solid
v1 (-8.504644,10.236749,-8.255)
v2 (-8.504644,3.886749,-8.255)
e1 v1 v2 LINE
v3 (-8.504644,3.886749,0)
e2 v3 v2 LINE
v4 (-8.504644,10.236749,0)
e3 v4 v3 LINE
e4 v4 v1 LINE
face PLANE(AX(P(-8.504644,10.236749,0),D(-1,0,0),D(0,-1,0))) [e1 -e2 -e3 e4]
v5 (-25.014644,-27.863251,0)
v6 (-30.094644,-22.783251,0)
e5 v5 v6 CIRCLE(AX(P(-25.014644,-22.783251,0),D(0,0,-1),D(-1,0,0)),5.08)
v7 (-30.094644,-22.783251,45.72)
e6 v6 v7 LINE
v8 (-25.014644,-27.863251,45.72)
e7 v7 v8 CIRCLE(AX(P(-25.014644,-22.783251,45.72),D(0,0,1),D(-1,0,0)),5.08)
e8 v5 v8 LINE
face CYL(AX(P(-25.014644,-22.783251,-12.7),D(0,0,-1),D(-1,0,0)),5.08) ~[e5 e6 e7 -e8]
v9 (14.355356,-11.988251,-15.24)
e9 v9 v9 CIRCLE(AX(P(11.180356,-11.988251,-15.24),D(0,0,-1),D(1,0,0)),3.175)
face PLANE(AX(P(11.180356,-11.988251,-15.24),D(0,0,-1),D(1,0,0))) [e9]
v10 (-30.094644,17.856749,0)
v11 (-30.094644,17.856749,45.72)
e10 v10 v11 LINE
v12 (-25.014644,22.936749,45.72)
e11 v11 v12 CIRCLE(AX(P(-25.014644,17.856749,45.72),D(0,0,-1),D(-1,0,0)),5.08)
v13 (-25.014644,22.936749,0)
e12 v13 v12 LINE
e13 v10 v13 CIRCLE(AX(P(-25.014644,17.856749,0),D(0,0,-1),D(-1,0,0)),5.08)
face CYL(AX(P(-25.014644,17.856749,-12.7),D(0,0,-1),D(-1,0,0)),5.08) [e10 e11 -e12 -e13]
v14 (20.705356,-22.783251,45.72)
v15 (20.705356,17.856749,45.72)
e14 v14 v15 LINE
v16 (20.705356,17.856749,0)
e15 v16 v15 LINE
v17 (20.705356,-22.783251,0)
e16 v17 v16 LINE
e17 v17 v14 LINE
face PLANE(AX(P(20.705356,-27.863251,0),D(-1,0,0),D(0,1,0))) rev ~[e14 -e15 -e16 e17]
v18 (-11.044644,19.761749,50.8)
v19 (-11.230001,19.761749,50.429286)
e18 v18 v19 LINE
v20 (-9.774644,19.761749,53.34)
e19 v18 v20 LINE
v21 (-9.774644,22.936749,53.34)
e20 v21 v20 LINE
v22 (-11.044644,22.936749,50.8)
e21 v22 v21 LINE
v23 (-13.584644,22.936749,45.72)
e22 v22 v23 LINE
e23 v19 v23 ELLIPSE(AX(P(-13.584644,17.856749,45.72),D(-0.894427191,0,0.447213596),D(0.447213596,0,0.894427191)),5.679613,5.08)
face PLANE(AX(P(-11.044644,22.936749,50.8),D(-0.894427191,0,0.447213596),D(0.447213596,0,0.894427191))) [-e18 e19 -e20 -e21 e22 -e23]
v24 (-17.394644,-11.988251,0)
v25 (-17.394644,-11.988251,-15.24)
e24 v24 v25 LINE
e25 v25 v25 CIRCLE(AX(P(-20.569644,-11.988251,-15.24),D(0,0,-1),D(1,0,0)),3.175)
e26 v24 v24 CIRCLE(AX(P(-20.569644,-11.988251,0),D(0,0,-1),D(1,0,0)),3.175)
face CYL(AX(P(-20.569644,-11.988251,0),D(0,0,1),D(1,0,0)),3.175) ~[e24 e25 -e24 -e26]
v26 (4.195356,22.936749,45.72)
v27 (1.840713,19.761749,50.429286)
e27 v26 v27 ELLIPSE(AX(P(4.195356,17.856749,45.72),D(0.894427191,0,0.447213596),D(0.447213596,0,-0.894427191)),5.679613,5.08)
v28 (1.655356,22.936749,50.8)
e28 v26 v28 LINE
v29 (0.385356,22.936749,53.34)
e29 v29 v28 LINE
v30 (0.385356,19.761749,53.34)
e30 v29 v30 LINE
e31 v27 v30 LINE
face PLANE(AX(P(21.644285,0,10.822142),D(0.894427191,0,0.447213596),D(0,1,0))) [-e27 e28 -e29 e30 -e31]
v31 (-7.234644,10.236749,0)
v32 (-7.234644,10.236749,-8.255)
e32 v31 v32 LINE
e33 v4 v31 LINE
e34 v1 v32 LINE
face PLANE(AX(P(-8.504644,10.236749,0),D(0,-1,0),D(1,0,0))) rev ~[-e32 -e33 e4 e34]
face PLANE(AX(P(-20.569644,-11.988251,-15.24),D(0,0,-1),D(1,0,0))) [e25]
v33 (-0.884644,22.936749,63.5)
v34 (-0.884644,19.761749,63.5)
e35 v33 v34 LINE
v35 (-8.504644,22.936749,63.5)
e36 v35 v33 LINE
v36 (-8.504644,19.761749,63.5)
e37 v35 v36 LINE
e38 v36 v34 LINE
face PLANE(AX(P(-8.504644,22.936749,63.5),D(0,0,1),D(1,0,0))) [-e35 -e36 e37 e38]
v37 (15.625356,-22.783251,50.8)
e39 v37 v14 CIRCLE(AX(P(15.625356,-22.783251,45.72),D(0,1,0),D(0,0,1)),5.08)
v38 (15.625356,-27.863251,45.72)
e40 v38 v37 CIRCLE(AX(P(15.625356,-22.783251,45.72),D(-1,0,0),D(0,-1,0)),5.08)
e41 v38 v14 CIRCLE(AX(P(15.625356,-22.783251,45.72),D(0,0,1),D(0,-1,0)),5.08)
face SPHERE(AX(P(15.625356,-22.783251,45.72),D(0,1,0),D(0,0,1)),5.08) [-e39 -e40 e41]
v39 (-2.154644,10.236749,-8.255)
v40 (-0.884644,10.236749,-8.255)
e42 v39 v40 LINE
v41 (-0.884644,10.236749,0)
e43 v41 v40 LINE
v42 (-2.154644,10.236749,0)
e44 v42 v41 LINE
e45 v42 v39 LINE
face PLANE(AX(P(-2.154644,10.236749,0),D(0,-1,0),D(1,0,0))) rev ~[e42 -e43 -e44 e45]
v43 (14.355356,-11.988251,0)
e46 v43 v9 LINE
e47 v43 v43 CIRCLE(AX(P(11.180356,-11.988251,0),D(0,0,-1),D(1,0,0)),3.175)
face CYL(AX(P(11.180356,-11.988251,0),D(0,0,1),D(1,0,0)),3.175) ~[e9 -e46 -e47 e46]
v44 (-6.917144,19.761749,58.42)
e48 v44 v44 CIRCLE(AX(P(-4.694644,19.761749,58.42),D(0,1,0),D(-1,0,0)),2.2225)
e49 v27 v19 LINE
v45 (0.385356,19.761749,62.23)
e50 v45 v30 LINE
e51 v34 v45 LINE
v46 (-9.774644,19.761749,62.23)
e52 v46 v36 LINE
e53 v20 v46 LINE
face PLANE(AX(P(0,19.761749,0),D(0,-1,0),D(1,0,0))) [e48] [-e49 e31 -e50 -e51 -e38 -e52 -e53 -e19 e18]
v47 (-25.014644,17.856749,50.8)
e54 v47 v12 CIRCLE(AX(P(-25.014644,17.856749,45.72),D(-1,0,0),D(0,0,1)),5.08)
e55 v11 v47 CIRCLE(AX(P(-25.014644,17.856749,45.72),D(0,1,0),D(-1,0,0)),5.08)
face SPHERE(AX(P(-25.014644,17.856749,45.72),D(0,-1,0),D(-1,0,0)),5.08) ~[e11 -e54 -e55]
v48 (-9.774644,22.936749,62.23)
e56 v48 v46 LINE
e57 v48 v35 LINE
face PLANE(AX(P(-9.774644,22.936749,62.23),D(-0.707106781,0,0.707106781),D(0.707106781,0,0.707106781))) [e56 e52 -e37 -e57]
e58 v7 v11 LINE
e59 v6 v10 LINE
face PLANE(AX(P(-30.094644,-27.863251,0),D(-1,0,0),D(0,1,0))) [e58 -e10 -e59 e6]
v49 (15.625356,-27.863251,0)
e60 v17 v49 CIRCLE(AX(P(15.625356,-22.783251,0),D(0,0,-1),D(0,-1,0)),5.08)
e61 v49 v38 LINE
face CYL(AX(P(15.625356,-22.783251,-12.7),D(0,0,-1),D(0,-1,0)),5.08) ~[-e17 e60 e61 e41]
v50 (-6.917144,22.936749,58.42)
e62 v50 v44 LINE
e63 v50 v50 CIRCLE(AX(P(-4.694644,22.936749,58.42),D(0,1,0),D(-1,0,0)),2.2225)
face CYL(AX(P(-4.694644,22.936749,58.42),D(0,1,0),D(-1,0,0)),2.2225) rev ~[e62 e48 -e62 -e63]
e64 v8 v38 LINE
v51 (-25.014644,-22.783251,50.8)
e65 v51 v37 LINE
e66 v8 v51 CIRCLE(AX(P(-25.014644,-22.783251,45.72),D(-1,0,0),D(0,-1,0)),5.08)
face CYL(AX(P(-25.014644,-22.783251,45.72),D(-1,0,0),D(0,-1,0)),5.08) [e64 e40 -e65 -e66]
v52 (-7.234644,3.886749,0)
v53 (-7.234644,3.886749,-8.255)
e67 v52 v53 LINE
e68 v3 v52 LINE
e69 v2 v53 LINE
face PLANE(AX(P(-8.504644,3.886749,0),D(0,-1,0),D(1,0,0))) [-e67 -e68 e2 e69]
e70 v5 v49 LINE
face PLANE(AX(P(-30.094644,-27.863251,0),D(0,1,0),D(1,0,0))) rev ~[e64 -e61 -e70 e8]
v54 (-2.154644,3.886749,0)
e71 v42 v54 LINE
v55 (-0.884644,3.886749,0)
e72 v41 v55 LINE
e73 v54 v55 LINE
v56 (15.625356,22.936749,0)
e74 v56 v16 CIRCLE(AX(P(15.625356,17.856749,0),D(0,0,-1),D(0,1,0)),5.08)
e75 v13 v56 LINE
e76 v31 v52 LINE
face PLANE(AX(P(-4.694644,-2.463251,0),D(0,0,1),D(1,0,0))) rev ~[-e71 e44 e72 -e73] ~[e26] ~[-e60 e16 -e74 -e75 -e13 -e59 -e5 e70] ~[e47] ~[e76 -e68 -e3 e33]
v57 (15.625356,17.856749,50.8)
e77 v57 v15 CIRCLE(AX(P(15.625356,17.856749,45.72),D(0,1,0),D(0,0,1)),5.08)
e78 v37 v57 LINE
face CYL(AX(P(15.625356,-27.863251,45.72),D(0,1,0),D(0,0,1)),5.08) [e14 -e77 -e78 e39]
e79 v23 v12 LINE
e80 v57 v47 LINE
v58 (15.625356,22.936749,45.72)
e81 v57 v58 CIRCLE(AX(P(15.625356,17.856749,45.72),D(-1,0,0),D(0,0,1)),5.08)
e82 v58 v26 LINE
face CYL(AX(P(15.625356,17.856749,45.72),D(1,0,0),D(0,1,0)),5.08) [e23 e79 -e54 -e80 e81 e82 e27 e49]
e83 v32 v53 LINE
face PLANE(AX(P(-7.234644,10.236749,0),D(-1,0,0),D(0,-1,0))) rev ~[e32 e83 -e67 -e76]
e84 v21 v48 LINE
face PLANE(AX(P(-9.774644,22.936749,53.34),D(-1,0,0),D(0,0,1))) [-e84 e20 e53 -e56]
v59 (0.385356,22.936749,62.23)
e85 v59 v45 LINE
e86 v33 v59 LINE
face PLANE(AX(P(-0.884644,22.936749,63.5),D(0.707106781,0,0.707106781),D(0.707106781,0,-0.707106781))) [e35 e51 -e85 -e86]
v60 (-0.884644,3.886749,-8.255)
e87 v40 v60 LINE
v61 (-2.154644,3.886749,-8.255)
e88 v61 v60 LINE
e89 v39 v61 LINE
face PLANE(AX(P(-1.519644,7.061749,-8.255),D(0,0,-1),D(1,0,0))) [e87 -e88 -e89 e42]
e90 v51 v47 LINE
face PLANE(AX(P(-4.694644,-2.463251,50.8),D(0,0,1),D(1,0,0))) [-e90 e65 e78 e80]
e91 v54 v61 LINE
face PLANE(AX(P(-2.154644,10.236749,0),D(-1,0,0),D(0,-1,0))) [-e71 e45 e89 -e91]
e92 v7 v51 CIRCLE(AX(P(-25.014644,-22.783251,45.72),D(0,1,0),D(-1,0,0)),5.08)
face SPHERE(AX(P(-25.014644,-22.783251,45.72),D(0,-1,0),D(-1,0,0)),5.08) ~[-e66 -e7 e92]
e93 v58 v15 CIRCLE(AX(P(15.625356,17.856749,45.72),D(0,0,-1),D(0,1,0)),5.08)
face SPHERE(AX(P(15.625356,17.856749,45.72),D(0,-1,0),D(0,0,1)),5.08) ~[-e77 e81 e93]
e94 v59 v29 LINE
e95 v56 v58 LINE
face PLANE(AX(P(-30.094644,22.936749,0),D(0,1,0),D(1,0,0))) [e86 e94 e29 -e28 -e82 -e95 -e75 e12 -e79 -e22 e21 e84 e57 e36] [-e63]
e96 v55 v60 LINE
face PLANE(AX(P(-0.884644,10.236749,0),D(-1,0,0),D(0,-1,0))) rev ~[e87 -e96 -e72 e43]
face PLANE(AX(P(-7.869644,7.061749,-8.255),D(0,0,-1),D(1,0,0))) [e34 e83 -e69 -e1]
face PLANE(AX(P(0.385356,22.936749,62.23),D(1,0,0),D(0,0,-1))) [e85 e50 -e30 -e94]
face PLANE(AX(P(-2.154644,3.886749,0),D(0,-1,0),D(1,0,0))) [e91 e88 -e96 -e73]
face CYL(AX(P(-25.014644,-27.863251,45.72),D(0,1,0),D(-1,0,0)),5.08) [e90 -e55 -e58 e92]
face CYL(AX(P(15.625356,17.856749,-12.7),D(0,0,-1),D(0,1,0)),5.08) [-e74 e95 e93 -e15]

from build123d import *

# Parameters (mm, degrees)
F0_W         = 50.8
F0_H         = 50.8
F1_DEPTH     = 50.8
F2_R         = 2.2225
F3_DEPTH     = 3.175
F5_R         = 5.08
F6_T1_DEPTH  = 40.64
F6_T3_DEPTH  = 58.42
F6_T6_ANGLE  = 90
F6_T10_DEPTH = 26.67
F6_T16_DEPTH = 26.67
F6_T22_DEPTH = 26.67
F6_T27_ANGLE = 90
F6_T31_DEPTH = 26.67
F6_T38_DEPTH = 26.67
F6_T44_DEPTH = 26.67
F6_T48_ANGLE = 90
F6_T50_ANGLE = 90
F7_R         = 3.175
F8_DEPTH     = 15.24
F7_W         = 1.27
F7_H         = 6.35
F9_DEPTH     = 8.255


# Not quite as in the source:
# - a fillet or chamfer that OpenCascade refuses, or shapes differently, is made with other operations: its cross-section is extruded or revolved along the edge and cut away or added
# - a feature of the source that left no trace in its solid (it failed there, or was rolled back) is left out


with BuildPart() as f1:
    # F0 (on Top) → F1 (new body)
    with BuildSketch(Plane.XY):
        with Locations((-4.6946440548, -2.4632510453)):
            Rectangle(F0_W, F0_H)
    extrude(amount=F1_DEPTH)

    # F2 (on face) → F3 (join)
    with BuildSketch(Plane(origin=(0, 22.9367489547, 0), x_dir=(-1, 0, 0), z_dir=(0, 1, 0))):
        Polygon((-0.3853559452, 62.23), (-0.3853559452, 53.34), (9.7746440548, 53.34), (9.7746440548, 62.23), (8.5046440548, 63.5), (0.8846440548, 63.5), align=None)
        with Locations((4.6946440548, 58.42)):
            Circle(F2_R, mode=Mode.SUBTRACT)
        Polygon((-0.3853559452, 53.34), (-1.6553559452, 50.8), (11.0446440548, 50.8), (9.7746440548, 53.34), align=None)
    extrude(amount=-F3_DEPTH)

    # F5
    f5_edges = [f1.edges().sort_by_distance(p)[0] for p in [
        (-30.094644, -2.463251, 50.8),
        (20.705356, -2.463251, 50.8),
    ]]
    fillet(f5_edges, radius=F5_R)

    # F6: fillet of radius 5.08 on 11 edges, made by hand

    # F6_s2 → F6_t1 (cut)
    with BuildSketch(Plane.YZ.offset(-25.0146440548)):
        with BuildLine():
            ThreePointArc((-27.8632510453, 45.72), (-26.3753534938, 49.3121024484), (-22.7832510453, 50.8))
            Line((-22.7832510453, 50.8), (-27.8632510453, 50.8))
            Line((-27.8632510453, 50.8), (-27.8632510453, 45.72))
        make_face()
    extrude(amount=F6_T1_DEPTH, mode=Mode.SUBTRACT)

    # F6_s4 → F6_t3 (cut)
    with BuildSketch(Plane.XY.offset(-12.7)):
        with BuildLine():
            ThreePointArc((-30.0946440548, 17.8567489547), (-28.6067465032, 21.4488514031), (-25.0146440548, 22.9367489547))
            Line((-25.0146440548, 22.9367489547), (-30.0946440548, 22.9367489547))
            Line((-30.0946440548, 22.9367489547), (-30.0946440548, 17.8567489547))
        make_face()
        with BuildLine():
            ThreePointArc((-30.0946440548, -22.7832510453), (-28.6067465032, -26.3753534938), (-25.0146440548, -27.8632510453))
            Line((-25.0146440548, -27.8632510453), (-30.0946440548, -27.8632510453))
            Line((-30.0946440548, -27.8632510453), (-30.0946440548, -22.7832510453))
        make_face()
        with BuildLine():
            ThreePointArc((15.6253559452, 22.9367489547), (19.2174583937, 21.4488514031), (20.7053559452, 17.8567489547))
            Line((20.7053559452, 17.8567489547), (20.7053559452, 22.9367489547))
            Line((20.7053559452, 22.9367489547), (15.6253559452, 22.9367489547))
        make_face()
        with BuildLine():
            ThreePointArc((15.6253559452, -27.8632510453), (19.2174583937, -26.3753534938), (20.7053559452, -22.7832510453))
            Line((20.7053559452, -22.7832510453), (20.7053559452, -27.8632510453))
            Line((20.7053559452, -27.8632510453), (15.6253559452, -27.8632510453))
        make_face()
    extrude(amount=F6_T3_DEPTH, mode=Mode.SUBTRACT)

    # F6_s5 → F6_t6 (revolve, cut)
    with BuildSketch(Plane.YZ.offset(15.6253559452)):
        with BuildLine():
            ThreePointArc((22.9367489547, 45.72), (21.4488514031, 49.3121024484), (17.8567489547, 50.8))
            Line((17.8567489547, 50.8), (22.9367489547, 50.8))
            Line((22.9367489547, 50.8), (22.9367489547, 45.72))
        make_face()
    revolve(axis=Axis((15.6253559452, 22.9367489547, 45.72), (0, 1, 0)), revolution_arc=F6_T6_ANGLE, mode=Mode.SUBTRACT)


with BuildPart() as f6_tool8:
    # F6_s9 → F6_t10 (new body)
    with BuildSketch(Plane.YZ.offset(15.6253559452)):
        with BuildLine():
            ThreePointArc((22.9367489547, 45.72), (21.4488514031, 49.3121024484), (17.8567489547, 50.8))
            Line((17.8567489547, 50.8), (22.9367489547, 50.8))
            Line((22.9367489547, 50.8), (22.9367489547, 45.72))
        make_face()
    extrude(amount=-F6_T10_DEPTH)

    split(bisect_by=Plane.XZ.offset(-19.7617489547), keep=Keep.BOTTOM)

    split(bisect_by=Plane(origin=(21.6442847562, 0, 10.8221423781), x_dir=(0, 1, 0), z_dir=(0.894427191, 0, 0.4472135955)), keep=Keep.TOP)


with BuildPart() as f1_1:
    add(f1.part)

    # F6_t7: cut F6_tool8
    add(f6_tool8.part, mode=Mode.SUBTRACT)


with BuildPart() as f6_tool14:
    # F6_s15 → F6_t16 (new body)
    with BuildSketch(Plane.YZ.offset(15.6253559452)):
        with BuildLine():
            ThreePointArc((22.9367489547, 45.72), (21.4488514031, 49.3121024484), (17.8567489547, 50.8))
            Line((17.8567489547, 50.8), (22.9367489547, 50.8))
            Line((22.9367489547, 50.8), (22.9367489547, 45.72))
        make_face()
    extrude(amount=-F6_T16_DEPTH)

    split(bisect_by=Plane.XZ.offset(-19.7617489547), keep=Keep.TOP)

    split(bisect_by=Plane(origin=(21.6442847562, 0, 10.8221423781), x_dir=(0, 1, 0), z_dir=(0.894427191, 0, 0.4472135955)), keep=Keep.TOP)


with BuildPart() as f1_2:
    add(f1_1.part)

    # F6_t13: cut F6_tool14
    add(f6_tool14.part, mode=Mode.SUBTRACT)


with BuildPart() as f6_tool20:
    # F6_s21 → F6_t22 (new body)
    with BuildSketch(Plane.YZ.offset(15.6253559452)):
        with BuildLine():
            ThreePointArc((22.9367489547, 45.72), (21.4488514031, 49.3121024484), (17.8567489547, 50.8))
            Line((17.8567489547, 50.8), (22.9367489547, 50.8))
            Line((22.9367489547, 50.8), (22.9367489547, 45.72))
        make_face()
    extrude(amount=-F6_T22_DEPTH)

    split(bisect_by=Plane(origin=(-29.1557152438, 0, 14.5778576219), x_dir=(0, 1, 0), z_dir=(0.894427191, 0, -0.4472135955)), keep=Keep.TOP)

    split(bisect_by=Plane.XZ.offset(-19.7617489547), keep=Keep.TOP)

    split(bisect_by=Plane(origin=(21.6442847562, 0, 10.8221423781), x_dir=(0, 1, 0), z_dir=(-0.894427191, 0, -0.4472135955)), keep=Keep.TOP)


with BuildPart() as f1_3:
    add(f1_2.part)

    # F6_t19: cut F6_tool20
    add(f6_tool20.part, mode=Mode.SUBTRACT)

    # F6_s26 → F6_t27 (revolve, cut)
    with BuildSketch(Plane.XY.offset(45.72)):
        with BuildLine():
            ThreePointArc((-25.0146440548, 22.9367489547), (-28.6067465032, 21.4488514031), (-30.0946440548, 17.8567489547))
            Line((-30.0946440548, 17.8567489547), (-30.0946440548, 22.9367489547))
            Line((-30.0946440548, 22.9367489547), (-25.0146440548, 22.9367489547))
        make_face()
    revolve(axis=Axis((-25.0146440548, 22.9367489547, 45.72), (0, 1, 0)), revolution_arc=F6_T27_ANGLE, mode=Mode.SUBTRACT)


with BuildPart() as f6_tool29:
    # F6_s30 → F6_t31 (new body)
    with BuildSketch(Plane.YZ.offset(1.6553559452)):
        with BuildLine():
            ThreePointArc((22.9367489547, 45.72), (21.4488514031, 49.3121024484), (17.8567489547, 50.8))
            Line((17.8567489547, 50.8), (22.9367489547, 50.8))
            Line((22.9367489547, 50.8), (22.9367489547, 45.72))
        make_face()
    extrude(amount=-F6_T31_DEPTH)

    split(bisect_by=Plane(origin=(-29.1557152438, 0, 14.5778576219), x_dir=(0, 1, 0), z_dir=(0.894427191, 0, -0.4472135955)), keep=Keep.TOP)

    split(bisect_by=Plane.XZ.offset(-19.7617489547), keep=Keep.TOP)

    split(bisect_by=Plane(origin=(21.6442847562, 0, 10.8221423781), x_dir=(0, 1, 0), z_dir=(-0.894427191, 0, -0.4472135955)), keep=Keep.TOP)


with BuildPart() as f1_4:
    add(f1_3.part)

    # F6_t28: cut F6_tool29
    add(f6_tool29.part, mode=Mode.SUBTRACT)


with BuildPart() as f6_tool36:
    # F6_s37 → F6_t38 (new body)
    with BuildSketch(Plane.YZ.offset(1.6553559452)):
        with BuildLine():
            ThreePointArc((22.9367489547, 45.72), (21.4488514031, 49.3121024484), (17.8567489547, 50.8))
            Line((17.8567489547, 50.8), (22.9367489547, 50.8))
            Line((22.9367489547, 50.8), (22.9367489547, 45.72))
        make_face()
    extrude(amount=-F6_T38_DEPTH)

    split(bisect_by=Plane(origin=(-29.1557152438, 0, 14.5778576219), x_dir=(0, 1, 0), z_dir=(-0.894427191, 0, 0.4472135955)), keep=Keep.TOP)

    split(bisect_by=Plane.XZ.offset(-19.7617489547), keep=Keep.BOTTOM)


with BuildPart() as f1_5:
    add(f1_4.part)

    # F6_t35: cut F6_tool36
    add(f6_tool36.part, mode=Mode.SUBTRACT)


with BuildPart() as f6_tool42:
    # F6_s43 → F6_t44 (new body)
    with BuildSketch(Plane.YZ.offset(1.6553559452)):
        with BuildLine():
            ThreePointArc((22.9367489547, 45.72), (21.4488514031, 49.3121024484), (17.8567489547, 50.8))
            Line((17.8567489547, 50.8), (22.9367489547, 50.8))
            Line((22.9367489547, 50.8), (22.9367489547, 45.72))
        make_face()
    extrude(amount=-F6_T44_DEPTH)

    split(bisect_by=Plane(origin=(-29.1557152438, 0, 14.5778576219), x_dir=(0, 1, 0), z_dir=(-0.894427191, 0, 0.4472135955)), keep=Keep.TOP)

    split(bisect_by=Plane.XZ.offset(-19.7617489547), keep=Keep.TOP)


with BuildPart() as f1_6:
    add(f1_5.part)

    # F6_t41: cut F6_tool42
    add(f6_tool42.part, mode=Mode.SUBTRACT)

    # F6_s47 → F6_t48 (revolve, cut)
    with BuildSketch(Plane.XY.offset(45.72)):
        with BuildLine():
            ThreePointArc((-30.0946440548, -22.7832510453), (-28.6067465032, -26.3753534938), (-25.0146440548, -27.8632510453))
            Line((-25.0146440548, -27.8632510453), (-30.0946440548, -27.8632510453))
            Line((-30.0946440548, -27.8632510453), (-30.0946440548, -22.7832510453))
        make_face()
    revolve(axis=Axis((-25.0146440548, -27.8632510453, 45.72), (0, 1, 0)), revolution_arc=F6_T48_ANGLE, mode=Mode.SUBTRACT)

    # F6_s49 → F6_t50 (revolve, cut)
    with BuildSketch(Plane.YZ.offset(15.6253559452)):
        with BuildLine():
            ThreePointArc((-27.8632510453, 45.72), (-26.3753534938, 49.3121024484), (-22.7832510453, 50.8))
            Line((-22.7832510453, 50.8), (-27.8632510453, 50.8))
            Line((-27.8632510453, 50.8), (-27.8632510453, 45.72))
        make_face()
    revolve(axis=Axis((15.6253559452, -27.8632510453, 45.72), (0, 1, 0)), revolution_arc=F6_T50_ANGLE, mode=Mode.SUBTRACT)

    # F7 (on face) → F8 (join)
    with BuildSketch(Plane(origin=(0, 0, 0), x_dir=(1, 0, 0), z_dir=(0, 0, -1))):
        with Locations((-20.5696440548, 11.9882510453)):
            Circle(F7_R)
        with Locations((11.1803559452, 11.9882510453)):
            Circle(F7_R)
    extrude(amount=F8_DEPTH)

    # F7 (on face) → F9 (join)
    with BuildSketch(Plane(origin=(0, 0, 0), x_dir=(1, 0, 0), z_dir=(0, 0, -1))):
        with Locations((-7.8696440548, -7.0617489547)):
            Rectangle(F7_W, F7_H)
        with Locations((-1.5196440548, -7.0617489547)):
            Rectangle(F7_W, F7_H)
    extrude(amount=F9_DEPTH)


solid = f1_6.part
